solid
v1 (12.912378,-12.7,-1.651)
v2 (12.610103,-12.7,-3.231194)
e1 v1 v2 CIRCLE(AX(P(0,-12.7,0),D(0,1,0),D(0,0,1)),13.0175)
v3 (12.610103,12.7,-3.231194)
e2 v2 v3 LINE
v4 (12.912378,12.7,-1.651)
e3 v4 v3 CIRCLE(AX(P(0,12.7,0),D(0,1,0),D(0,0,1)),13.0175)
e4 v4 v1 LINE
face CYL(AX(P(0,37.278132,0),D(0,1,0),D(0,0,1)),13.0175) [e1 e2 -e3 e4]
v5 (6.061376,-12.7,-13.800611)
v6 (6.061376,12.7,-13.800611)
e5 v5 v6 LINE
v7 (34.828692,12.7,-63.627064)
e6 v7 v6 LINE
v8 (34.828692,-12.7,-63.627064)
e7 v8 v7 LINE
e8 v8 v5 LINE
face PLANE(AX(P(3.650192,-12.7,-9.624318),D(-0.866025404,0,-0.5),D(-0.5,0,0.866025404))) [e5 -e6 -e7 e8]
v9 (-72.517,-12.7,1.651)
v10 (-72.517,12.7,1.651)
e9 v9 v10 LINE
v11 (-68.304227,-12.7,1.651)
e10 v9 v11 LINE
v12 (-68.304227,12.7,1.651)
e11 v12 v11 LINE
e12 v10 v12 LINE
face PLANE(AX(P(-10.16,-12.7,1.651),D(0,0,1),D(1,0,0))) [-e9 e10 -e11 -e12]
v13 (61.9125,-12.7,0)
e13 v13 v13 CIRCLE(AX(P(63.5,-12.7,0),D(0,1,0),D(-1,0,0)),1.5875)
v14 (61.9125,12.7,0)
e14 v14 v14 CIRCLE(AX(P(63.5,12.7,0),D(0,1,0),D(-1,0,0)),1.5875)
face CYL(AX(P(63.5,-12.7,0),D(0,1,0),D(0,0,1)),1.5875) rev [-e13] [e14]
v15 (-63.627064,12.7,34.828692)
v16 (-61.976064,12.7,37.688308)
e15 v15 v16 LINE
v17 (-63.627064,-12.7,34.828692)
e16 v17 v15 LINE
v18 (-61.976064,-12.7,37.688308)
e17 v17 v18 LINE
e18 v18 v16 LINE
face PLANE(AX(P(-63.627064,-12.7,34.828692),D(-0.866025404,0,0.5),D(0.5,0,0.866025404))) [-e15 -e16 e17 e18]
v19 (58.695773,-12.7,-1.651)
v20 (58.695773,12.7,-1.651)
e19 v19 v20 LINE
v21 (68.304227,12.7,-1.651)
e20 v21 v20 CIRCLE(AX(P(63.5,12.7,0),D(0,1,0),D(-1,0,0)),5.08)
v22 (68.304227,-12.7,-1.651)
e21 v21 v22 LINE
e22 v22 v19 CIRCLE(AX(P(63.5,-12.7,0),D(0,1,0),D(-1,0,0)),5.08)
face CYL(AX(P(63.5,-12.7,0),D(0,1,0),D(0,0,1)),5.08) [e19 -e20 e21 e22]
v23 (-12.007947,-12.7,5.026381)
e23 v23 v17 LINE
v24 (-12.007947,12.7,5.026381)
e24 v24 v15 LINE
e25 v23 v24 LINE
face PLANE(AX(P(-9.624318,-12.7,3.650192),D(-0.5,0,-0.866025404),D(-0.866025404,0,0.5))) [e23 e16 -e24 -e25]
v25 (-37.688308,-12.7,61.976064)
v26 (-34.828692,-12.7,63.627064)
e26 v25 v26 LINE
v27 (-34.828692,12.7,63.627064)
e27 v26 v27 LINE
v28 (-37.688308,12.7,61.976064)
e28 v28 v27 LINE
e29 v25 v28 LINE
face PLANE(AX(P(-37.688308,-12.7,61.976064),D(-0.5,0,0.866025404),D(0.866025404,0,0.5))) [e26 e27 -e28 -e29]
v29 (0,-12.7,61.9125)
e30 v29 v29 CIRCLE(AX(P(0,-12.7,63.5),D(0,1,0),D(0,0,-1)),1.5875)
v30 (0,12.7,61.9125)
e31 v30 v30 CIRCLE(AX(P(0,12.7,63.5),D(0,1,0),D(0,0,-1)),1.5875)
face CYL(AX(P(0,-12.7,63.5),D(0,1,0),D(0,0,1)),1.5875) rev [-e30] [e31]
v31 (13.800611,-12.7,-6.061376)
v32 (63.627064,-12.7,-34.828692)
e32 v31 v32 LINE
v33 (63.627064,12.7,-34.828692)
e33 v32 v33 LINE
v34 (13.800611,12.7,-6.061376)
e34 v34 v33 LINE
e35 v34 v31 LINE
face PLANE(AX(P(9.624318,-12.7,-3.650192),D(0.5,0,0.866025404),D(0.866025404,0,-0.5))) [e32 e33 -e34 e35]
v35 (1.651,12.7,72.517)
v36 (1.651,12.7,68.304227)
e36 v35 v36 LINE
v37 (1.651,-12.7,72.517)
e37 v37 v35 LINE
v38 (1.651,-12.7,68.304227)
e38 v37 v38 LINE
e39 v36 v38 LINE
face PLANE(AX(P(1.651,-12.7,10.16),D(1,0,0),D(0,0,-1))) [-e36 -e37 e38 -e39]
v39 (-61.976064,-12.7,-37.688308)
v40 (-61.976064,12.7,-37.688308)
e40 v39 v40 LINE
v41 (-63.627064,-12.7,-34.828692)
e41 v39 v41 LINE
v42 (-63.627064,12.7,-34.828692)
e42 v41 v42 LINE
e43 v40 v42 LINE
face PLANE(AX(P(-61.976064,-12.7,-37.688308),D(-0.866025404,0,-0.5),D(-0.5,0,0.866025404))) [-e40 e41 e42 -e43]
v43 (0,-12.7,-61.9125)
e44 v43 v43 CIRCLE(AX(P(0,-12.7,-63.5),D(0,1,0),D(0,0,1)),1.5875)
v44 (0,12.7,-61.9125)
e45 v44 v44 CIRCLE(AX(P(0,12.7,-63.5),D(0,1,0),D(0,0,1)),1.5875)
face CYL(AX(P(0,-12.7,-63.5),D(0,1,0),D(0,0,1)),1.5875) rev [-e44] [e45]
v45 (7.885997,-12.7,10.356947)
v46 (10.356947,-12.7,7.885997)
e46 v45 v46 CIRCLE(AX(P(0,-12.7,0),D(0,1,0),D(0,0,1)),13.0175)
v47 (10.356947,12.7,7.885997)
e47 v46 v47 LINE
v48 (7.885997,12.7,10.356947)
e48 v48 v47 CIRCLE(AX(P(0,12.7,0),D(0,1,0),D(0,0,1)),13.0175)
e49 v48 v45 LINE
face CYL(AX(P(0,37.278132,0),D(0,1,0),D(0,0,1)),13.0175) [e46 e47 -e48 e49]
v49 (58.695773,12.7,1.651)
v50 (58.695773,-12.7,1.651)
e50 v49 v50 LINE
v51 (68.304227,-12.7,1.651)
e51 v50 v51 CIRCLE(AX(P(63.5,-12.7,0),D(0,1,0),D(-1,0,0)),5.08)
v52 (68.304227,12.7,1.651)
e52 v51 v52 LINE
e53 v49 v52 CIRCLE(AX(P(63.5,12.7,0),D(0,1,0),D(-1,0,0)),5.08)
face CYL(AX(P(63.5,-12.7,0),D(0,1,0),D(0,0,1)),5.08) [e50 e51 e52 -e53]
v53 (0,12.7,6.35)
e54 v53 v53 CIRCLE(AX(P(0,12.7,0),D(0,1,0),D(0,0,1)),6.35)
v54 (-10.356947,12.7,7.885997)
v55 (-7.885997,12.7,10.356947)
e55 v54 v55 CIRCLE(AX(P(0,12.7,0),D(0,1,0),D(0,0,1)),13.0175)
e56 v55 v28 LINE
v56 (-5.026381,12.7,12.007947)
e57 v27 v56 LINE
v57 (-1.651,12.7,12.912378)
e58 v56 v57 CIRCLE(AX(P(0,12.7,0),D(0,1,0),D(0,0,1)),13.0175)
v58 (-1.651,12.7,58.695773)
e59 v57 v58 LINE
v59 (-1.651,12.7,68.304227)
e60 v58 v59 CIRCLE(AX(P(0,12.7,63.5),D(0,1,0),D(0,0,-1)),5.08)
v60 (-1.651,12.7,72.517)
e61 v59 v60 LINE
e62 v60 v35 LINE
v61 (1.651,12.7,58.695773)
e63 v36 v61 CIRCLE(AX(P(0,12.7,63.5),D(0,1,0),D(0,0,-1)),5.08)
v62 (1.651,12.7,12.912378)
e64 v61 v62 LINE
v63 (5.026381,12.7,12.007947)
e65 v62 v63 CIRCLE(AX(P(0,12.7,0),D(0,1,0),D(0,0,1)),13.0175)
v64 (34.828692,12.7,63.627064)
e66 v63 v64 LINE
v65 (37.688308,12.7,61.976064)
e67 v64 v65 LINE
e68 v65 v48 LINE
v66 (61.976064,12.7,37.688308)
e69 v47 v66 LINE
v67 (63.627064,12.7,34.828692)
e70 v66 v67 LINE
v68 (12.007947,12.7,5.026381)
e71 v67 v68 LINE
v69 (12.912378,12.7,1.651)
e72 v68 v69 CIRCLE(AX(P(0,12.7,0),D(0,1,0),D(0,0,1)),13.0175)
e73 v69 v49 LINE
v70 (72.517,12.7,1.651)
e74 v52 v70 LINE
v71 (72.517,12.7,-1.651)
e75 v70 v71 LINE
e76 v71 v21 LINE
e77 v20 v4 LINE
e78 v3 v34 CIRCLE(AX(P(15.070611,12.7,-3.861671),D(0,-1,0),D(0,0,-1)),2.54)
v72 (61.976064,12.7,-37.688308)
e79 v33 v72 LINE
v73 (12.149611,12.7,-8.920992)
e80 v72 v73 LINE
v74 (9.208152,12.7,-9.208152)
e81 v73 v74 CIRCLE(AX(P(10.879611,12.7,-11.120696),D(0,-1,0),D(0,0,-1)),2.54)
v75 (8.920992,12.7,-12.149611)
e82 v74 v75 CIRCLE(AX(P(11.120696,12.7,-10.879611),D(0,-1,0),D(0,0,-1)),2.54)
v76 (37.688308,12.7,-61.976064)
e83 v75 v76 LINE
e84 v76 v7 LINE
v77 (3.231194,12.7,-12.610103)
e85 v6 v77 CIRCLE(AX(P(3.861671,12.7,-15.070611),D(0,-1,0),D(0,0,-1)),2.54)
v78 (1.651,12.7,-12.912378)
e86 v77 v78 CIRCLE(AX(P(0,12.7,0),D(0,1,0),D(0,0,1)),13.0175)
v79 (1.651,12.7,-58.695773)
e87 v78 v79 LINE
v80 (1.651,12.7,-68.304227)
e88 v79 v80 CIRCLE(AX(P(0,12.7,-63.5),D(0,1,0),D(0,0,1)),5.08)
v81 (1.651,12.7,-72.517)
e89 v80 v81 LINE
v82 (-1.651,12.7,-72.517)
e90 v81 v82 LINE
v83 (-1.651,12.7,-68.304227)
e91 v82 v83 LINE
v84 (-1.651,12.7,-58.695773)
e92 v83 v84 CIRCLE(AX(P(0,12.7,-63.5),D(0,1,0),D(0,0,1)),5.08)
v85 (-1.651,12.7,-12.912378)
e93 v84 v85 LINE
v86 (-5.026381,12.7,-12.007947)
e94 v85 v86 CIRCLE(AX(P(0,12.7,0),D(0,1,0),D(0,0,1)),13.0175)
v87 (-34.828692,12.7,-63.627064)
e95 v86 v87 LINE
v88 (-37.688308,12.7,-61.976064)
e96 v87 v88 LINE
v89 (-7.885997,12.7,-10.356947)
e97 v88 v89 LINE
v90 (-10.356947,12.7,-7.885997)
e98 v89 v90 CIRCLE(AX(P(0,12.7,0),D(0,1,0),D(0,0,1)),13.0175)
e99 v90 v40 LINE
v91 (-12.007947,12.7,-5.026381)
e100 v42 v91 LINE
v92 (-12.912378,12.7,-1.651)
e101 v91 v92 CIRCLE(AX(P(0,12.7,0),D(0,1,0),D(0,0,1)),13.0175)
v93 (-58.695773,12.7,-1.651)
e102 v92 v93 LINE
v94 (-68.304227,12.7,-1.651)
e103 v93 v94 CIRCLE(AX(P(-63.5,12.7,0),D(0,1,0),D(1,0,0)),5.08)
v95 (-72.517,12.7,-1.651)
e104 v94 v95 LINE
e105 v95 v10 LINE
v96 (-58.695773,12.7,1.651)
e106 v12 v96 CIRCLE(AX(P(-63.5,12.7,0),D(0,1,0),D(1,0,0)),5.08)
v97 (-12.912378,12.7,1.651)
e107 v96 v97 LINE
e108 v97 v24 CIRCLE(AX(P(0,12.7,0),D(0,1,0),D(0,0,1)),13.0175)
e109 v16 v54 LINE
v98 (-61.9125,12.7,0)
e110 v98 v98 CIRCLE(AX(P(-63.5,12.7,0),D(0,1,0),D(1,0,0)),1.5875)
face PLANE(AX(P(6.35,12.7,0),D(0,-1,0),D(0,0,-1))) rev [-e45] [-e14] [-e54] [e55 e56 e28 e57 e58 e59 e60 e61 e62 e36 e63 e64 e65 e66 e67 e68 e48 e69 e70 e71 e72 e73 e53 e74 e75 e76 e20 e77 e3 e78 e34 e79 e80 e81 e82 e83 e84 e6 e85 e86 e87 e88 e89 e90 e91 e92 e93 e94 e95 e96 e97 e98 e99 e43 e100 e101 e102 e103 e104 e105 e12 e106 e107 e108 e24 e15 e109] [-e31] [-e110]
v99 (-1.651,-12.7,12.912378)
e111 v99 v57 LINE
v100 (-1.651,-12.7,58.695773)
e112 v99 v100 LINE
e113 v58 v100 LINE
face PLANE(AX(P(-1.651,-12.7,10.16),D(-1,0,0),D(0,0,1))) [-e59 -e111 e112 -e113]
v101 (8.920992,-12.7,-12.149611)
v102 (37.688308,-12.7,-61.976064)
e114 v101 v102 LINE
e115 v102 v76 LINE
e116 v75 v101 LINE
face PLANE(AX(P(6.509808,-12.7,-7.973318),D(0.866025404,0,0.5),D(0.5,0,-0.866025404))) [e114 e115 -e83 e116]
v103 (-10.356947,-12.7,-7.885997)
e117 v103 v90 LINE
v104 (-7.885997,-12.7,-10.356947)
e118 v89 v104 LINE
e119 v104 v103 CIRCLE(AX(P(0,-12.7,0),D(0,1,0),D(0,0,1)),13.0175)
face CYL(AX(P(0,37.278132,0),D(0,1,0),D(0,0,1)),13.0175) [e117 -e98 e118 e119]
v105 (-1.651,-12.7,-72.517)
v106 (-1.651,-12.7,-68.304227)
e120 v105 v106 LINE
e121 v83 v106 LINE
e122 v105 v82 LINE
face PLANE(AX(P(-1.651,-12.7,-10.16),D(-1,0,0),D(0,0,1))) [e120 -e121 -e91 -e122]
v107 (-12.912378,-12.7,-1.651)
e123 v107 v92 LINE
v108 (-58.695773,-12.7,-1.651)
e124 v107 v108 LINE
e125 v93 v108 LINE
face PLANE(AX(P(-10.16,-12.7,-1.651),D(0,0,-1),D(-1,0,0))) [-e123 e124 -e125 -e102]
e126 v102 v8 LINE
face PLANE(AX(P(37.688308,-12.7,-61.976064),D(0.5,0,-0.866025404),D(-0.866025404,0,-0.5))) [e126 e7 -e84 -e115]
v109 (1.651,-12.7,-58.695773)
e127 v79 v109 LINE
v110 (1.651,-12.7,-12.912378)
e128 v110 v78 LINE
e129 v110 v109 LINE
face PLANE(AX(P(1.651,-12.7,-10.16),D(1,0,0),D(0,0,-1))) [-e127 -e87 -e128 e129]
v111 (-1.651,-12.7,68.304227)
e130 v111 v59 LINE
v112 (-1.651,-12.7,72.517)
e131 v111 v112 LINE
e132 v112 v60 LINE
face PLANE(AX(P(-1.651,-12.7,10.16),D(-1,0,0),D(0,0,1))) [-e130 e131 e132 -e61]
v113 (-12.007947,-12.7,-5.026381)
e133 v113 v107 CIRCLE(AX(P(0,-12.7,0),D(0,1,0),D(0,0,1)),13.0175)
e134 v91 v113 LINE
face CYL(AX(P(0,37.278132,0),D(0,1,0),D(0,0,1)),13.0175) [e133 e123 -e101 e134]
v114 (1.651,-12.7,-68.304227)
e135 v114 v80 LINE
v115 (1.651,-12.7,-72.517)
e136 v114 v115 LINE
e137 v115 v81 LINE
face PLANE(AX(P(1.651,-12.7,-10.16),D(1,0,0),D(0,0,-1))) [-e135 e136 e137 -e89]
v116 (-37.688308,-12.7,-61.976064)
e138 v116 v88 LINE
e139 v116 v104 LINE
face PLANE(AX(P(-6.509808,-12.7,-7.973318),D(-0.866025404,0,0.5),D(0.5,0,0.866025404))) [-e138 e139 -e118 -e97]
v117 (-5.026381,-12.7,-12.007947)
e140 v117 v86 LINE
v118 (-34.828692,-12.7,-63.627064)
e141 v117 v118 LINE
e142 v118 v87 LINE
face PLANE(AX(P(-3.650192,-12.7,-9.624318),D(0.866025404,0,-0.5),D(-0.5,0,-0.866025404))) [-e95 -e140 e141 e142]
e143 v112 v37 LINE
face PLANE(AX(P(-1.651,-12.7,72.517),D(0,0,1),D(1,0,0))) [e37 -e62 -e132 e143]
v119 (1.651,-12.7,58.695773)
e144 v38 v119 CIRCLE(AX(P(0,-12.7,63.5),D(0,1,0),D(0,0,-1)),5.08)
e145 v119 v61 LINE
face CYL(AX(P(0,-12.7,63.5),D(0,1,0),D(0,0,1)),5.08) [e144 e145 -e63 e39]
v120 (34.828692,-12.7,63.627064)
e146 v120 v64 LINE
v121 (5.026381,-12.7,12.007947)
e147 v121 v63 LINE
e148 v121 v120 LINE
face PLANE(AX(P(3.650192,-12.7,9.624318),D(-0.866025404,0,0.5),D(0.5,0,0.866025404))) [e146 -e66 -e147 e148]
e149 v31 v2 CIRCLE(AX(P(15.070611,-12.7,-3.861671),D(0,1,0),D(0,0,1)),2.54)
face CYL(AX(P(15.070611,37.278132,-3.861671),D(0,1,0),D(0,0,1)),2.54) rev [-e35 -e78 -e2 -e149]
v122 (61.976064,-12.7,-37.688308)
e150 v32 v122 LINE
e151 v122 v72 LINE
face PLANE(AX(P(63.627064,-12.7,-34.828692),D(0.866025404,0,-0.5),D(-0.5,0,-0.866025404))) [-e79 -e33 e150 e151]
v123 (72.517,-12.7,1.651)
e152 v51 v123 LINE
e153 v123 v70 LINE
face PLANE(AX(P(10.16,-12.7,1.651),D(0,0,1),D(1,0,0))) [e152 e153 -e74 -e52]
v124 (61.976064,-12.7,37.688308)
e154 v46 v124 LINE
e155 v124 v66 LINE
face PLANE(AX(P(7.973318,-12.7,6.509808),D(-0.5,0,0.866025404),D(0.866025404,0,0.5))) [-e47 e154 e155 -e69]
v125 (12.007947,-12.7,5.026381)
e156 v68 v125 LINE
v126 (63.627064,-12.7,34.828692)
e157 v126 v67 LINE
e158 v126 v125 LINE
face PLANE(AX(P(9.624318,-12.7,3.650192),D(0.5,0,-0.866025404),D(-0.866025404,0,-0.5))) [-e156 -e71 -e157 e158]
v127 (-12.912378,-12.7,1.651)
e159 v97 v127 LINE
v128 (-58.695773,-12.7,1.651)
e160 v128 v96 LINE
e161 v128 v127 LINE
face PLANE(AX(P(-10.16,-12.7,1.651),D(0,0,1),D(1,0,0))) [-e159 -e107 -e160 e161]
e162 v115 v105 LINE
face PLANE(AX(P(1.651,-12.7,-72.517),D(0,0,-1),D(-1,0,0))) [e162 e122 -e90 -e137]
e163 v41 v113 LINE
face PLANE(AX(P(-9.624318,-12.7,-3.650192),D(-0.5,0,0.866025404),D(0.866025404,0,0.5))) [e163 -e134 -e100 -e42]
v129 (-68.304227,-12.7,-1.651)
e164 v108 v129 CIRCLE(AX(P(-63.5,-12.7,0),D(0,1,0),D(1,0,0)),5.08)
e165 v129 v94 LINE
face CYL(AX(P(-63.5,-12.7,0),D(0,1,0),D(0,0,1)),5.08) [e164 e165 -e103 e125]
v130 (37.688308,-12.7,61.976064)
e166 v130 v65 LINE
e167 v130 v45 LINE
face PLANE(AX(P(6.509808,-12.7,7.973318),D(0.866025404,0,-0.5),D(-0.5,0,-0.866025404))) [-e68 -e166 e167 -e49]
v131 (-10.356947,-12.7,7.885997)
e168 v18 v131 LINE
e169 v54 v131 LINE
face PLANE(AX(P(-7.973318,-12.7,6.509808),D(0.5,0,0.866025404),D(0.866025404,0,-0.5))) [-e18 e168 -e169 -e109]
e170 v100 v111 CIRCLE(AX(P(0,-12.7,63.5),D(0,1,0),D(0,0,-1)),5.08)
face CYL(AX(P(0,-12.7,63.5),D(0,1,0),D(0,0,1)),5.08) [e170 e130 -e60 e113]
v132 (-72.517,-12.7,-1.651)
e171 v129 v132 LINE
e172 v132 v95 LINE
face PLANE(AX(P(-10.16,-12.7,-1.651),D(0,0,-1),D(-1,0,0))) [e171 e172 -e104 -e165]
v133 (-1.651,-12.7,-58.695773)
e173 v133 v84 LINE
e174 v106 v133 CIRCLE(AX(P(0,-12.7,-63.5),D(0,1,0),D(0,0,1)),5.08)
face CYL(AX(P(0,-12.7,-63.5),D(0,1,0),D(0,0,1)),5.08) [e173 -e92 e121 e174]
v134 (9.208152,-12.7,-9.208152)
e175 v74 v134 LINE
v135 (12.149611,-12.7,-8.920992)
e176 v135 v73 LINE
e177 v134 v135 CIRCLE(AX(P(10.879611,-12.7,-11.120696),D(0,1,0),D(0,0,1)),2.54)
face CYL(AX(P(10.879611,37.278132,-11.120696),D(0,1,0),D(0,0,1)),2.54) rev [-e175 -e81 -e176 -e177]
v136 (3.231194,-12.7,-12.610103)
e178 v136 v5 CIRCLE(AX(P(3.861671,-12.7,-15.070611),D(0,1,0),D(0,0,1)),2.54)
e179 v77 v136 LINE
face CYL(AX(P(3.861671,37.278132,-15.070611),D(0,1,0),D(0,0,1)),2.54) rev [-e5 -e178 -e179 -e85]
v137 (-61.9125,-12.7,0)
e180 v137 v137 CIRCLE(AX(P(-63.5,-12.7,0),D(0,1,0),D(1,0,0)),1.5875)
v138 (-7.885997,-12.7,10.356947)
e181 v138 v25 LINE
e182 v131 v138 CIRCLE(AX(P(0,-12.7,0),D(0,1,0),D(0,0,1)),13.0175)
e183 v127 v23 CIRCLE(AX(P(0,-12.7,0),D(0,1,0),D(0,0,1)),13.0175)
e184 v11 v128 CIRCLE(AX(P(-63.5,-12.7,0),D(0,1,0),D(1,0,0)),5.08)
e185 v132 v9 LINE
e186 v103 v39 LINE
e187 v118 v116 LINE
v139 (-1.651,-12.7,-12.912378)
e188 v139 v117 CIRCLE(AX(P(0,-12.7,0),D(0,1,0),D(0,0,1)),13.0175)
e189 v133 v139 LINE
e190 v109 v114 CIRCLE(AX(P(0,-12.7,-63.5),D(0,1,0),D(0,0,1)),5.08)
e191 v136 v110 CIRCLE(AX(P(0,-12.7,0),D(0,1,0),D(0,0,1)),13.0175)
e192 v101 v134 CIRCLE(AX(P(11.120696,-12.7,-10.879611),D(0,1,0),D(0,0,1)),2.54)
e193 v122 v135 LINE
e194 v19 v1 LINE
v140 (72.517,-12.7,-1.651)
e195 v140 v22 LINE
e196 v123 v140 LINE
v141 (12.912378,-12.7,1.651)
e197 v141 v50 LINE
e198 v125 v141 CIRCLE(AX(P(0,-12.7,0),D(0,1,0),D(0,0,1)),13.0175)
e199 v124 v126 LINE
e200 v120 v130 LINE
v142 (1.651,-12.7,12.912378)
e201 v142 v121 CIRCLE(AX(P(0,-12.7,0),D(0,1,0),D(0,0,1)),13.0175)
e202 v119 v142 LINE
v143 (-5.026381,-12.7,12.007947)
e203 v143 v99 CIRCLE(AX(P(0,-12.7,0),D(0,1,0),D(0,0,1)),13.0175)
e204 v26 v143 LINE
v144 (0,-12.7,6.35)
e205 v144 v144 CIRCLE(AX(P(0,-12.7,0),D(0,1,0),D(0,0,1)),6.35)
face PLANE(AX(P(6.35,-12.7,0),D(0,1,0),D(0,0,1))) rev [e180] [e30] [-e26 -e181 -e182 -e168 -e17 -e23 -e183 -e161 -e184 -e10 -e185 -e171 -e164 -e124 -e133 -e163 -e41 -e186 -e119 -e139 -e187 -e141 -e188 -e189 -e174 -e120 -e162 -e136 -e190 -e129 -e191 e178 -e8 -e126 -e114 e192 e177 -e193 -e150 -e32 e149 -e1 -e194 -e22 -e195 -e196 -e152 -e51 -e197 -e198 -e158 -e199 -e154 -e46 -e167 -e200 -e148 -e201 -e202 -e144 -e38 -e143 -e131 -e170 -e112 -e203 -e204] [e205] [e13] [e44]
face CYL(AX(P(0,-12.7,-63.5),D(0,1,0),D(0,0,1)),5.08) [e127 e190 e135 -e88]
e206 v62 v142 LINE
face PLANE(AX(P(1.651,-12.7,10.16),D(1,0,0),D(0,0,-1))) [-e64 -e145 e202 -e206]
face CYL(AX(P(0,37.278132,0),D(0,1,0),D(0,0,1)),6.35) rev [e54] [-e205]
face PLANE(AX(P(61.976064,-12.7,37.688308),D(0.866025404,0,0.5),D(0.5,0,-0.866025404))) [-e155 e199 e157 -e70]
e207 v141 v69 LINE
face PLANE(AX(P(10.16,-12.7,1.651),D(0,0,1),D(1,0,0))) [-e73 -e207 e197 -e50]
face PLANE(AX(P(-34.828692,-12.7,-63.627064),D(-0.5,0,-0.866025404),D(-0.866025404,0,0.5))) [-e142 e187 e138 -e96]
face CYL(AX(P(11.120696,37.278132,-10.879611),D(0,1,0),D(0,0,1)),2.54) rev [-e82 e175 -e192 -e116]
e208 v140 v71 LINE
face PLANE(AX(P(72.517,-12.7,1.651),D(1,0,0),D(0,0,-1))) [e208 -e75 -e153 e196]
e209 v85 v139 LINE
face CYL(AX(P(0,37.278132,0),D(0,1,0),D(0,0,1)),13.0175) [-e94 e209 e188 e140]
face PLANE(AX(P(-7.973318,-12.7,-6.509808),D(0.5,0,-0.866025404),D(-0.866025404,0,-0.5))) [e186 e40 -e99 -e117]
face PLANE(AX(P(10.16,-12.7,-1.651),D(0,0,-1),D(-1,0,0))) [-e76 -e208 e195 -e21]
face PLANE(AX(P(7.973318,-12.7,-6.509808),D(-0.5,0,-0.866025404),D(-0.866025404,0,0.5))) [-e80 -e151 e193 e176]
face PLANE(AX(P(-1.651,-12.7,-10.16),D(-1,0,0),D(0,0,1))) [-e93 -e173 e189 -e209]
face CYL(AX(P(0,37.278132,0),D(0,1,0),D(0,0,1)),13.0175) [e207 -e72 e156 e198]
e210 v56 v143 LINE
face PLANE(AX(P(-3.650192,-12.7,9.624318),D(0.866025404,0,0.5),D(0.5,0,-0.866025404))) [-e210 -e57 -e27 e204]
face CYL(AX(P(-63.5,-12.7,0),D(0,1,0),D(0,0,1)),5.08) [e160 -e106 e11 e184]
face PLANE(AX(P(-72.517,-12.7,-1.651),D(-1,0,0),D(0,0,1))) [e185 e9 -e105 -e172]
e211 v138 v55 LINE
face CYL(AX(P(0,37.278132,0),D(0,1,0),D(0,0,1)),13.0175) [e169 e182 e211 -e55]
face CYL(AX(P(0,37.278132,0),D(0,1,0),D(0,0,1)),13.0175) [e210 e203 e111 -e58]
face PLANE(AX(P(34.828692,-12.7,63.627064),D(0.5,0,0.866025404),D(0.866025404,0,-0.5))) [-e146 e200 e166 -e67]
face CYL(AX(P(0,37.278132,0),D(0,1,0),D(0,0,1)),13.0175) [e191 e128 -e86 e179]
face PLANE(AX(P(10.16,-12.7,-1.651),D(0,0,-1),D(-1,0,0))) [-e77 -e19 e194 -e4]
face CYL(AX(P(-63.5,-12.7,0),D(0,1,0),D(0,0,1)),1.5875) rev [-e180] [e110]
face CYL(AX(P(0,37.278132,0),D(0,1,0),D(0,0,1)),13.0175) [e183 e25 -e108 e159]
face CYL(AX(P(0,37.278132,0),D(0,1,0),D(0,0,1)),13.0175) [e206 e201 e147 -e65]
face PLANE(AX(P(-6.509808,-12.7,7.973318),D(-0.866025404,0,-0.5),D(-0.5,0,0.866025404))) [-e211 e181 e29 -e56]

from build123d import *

# Parameters (mm, degrees)
SKETCH1_W           = 6.6675
SKETCH1_H           = 25.4
SKETCH2_W           = 3.302
SKETCH2_H           = 62.357
BOSS_EXTRUDE1_DEPTH = 25.4
CIRPATTERN1_COUNT   = 12
FILLET1_R           = 2.54
SKETCH4_R           = 5.08
SKETCH4_R_2         = 1.5875
BOSS_EXTRUDE2_DEPTH = 25.4
SKETCH5_R           = 1.5875
CUT_EXTRUDE2_DEPTH  = 25.4
CIRPATTERN2_COUNT   = 4


with BuildPart() as part:
    # Sketch1 → Revolve1 (revolve)
    with BuildSketch(Plane.XY, mode=Mode.PRIVATE) as revolve1_sk:
        with Locations((9.68375, 0)):
            Rectangle(SKETCH1_W, SKETCH1_H)
    revolve(revolve1_sk.sketch.rotate(Axis((0, 37.278132, 0), (0, -1, 0)), 90), axis=Axis((0, 37.278132, 0), (0, -1, 0)))

    # Sketch2 → Boss-Extrude1 (add)
    with BuildSketch(Plane(origin=(0, 12.7, 0), x_dir=(1, 0, 0), z_dir=(0, 1, 0))):
        with Locations((0, -41.3385)):
            Rectangle(SKETCH2_W, SKETCH2_H)
    boss_extrude1 = extrude(amount=-BOSS_EXTRUDE1_DEPTH)

    # CirPattern1: Boss-Extrude1 ×12 about axis
    cirpattern1_axis = Axis((0, 0, 0), (0, 1, 0))
    for i in range(1, CIRPATTERN1_COUNT):
        add(boss_extrude1.rotate(cirpattern1_axis, i * 360 / CIRPATTERN1_COUNT))

    # Fillet1
    # the kernel refuses this fillet: 2.54 mm, written as the material it adds along each edge
    with BuildSketch(Plane(origin=(12.007947359, 12.7, -5.026381051), x_dir=(0.8660254037844386, 0, -0.5000000000000003), z_dir=(0, -1, 0)), Plane(origin=(7.885996935, 12.7, -10.356947359), x_dir=(0.5000000000000001, 0, -0.8660254037844385), z_dir=(0, -1, 0))) as fillet1_piece_1:
        with BuildLine():
            CenterArc((2.069989159, 2.54), FILLET1_R, 195.62783797, 74.37216203)
            ThreePointArc((-0.3761116, 1.855755102), (-0.154269512, 0.934725122), (0, 0))
            Line((0, 0), (2.069989159, 0))
        make_face()
    extrude(amount=25.4)
    with BuildSketch(Plane(origin=(10.356947359, 12.7, -7.885996935), x_dir=(-0.6620593723913752, 0, -0.7494513909712479), z_dir=(0, -1, 0)), Plane(origin=(5.026381051, 12.7, -12.007947359), x_dir=(-0.9480859307901371, 0, -0.31801425728699545), z_dir=(0, -1, 0))) as fillet1_piece_2:
        with BuildLine():
            CenterArc((2.078215675, 2.533273519), FILLET1_R, 191.457121991, 74.37216203)
            Line((-0.411171344, 2.028741788), (0, 0))
            ThreePointArc((0, 0), (0.946742697, 0.034473214), (1.893485393, 0))
        make_face()
    extrude(amount=25.4)

    # Sketch4 → Boss-Extrude2 (add)
    with BuildSketch(Plane(origin=(0, 12.7, 0), x_dir=(1, 0, 0), z_dir=(0, 1, 0))):
        with Locations((0, 63.5)):
            Circle(SKETCH4_R)
        with Locations((0, 63.5)):
            Circle(SKETCH4_R_2, mode=Mode.SUBTRACT)
    boss_extrude2 = extrude(amount=-BOSS_EXTRUDE2_DEPTH)

    # Sketch5 → Cut-Extrude2 (cut)
    with BuildSketch(Plane(origin=(0, 12.7, 0), x_dir=(1, 0, 0), z_dir=(0, 1, 0))):
        with Locations(Location((0, 63.5, 0), (0, 0, 270))):
            Circle(SKETCH5_R)
    cut_extrude2 = extrude(amount=-CUT_EXTRUDE2_DEPTH, mode=Mode.SUBTRACT)

    # CirPattern2: Boss-Extrude2, Cut-Extrude2 ×4 about axis
    cirpattern2_axis = Axis((0, 0, 0), (0, 1, 0))
    add([boss_extrude2.rotate(cirpattern2_axis, i * 360 / CIRPATTERN2_COUNT) for i in range(1, CIRPATTERN2_COUNT)])
    add([cut_extrude2.rotate(cirpattern2_axis, i * 360 / CIRPATTERN2_COUNT) for i in range(1, CIRPATTERN2_COUNT)], mode=Mode.SUBTRACT)


solid = part.part
